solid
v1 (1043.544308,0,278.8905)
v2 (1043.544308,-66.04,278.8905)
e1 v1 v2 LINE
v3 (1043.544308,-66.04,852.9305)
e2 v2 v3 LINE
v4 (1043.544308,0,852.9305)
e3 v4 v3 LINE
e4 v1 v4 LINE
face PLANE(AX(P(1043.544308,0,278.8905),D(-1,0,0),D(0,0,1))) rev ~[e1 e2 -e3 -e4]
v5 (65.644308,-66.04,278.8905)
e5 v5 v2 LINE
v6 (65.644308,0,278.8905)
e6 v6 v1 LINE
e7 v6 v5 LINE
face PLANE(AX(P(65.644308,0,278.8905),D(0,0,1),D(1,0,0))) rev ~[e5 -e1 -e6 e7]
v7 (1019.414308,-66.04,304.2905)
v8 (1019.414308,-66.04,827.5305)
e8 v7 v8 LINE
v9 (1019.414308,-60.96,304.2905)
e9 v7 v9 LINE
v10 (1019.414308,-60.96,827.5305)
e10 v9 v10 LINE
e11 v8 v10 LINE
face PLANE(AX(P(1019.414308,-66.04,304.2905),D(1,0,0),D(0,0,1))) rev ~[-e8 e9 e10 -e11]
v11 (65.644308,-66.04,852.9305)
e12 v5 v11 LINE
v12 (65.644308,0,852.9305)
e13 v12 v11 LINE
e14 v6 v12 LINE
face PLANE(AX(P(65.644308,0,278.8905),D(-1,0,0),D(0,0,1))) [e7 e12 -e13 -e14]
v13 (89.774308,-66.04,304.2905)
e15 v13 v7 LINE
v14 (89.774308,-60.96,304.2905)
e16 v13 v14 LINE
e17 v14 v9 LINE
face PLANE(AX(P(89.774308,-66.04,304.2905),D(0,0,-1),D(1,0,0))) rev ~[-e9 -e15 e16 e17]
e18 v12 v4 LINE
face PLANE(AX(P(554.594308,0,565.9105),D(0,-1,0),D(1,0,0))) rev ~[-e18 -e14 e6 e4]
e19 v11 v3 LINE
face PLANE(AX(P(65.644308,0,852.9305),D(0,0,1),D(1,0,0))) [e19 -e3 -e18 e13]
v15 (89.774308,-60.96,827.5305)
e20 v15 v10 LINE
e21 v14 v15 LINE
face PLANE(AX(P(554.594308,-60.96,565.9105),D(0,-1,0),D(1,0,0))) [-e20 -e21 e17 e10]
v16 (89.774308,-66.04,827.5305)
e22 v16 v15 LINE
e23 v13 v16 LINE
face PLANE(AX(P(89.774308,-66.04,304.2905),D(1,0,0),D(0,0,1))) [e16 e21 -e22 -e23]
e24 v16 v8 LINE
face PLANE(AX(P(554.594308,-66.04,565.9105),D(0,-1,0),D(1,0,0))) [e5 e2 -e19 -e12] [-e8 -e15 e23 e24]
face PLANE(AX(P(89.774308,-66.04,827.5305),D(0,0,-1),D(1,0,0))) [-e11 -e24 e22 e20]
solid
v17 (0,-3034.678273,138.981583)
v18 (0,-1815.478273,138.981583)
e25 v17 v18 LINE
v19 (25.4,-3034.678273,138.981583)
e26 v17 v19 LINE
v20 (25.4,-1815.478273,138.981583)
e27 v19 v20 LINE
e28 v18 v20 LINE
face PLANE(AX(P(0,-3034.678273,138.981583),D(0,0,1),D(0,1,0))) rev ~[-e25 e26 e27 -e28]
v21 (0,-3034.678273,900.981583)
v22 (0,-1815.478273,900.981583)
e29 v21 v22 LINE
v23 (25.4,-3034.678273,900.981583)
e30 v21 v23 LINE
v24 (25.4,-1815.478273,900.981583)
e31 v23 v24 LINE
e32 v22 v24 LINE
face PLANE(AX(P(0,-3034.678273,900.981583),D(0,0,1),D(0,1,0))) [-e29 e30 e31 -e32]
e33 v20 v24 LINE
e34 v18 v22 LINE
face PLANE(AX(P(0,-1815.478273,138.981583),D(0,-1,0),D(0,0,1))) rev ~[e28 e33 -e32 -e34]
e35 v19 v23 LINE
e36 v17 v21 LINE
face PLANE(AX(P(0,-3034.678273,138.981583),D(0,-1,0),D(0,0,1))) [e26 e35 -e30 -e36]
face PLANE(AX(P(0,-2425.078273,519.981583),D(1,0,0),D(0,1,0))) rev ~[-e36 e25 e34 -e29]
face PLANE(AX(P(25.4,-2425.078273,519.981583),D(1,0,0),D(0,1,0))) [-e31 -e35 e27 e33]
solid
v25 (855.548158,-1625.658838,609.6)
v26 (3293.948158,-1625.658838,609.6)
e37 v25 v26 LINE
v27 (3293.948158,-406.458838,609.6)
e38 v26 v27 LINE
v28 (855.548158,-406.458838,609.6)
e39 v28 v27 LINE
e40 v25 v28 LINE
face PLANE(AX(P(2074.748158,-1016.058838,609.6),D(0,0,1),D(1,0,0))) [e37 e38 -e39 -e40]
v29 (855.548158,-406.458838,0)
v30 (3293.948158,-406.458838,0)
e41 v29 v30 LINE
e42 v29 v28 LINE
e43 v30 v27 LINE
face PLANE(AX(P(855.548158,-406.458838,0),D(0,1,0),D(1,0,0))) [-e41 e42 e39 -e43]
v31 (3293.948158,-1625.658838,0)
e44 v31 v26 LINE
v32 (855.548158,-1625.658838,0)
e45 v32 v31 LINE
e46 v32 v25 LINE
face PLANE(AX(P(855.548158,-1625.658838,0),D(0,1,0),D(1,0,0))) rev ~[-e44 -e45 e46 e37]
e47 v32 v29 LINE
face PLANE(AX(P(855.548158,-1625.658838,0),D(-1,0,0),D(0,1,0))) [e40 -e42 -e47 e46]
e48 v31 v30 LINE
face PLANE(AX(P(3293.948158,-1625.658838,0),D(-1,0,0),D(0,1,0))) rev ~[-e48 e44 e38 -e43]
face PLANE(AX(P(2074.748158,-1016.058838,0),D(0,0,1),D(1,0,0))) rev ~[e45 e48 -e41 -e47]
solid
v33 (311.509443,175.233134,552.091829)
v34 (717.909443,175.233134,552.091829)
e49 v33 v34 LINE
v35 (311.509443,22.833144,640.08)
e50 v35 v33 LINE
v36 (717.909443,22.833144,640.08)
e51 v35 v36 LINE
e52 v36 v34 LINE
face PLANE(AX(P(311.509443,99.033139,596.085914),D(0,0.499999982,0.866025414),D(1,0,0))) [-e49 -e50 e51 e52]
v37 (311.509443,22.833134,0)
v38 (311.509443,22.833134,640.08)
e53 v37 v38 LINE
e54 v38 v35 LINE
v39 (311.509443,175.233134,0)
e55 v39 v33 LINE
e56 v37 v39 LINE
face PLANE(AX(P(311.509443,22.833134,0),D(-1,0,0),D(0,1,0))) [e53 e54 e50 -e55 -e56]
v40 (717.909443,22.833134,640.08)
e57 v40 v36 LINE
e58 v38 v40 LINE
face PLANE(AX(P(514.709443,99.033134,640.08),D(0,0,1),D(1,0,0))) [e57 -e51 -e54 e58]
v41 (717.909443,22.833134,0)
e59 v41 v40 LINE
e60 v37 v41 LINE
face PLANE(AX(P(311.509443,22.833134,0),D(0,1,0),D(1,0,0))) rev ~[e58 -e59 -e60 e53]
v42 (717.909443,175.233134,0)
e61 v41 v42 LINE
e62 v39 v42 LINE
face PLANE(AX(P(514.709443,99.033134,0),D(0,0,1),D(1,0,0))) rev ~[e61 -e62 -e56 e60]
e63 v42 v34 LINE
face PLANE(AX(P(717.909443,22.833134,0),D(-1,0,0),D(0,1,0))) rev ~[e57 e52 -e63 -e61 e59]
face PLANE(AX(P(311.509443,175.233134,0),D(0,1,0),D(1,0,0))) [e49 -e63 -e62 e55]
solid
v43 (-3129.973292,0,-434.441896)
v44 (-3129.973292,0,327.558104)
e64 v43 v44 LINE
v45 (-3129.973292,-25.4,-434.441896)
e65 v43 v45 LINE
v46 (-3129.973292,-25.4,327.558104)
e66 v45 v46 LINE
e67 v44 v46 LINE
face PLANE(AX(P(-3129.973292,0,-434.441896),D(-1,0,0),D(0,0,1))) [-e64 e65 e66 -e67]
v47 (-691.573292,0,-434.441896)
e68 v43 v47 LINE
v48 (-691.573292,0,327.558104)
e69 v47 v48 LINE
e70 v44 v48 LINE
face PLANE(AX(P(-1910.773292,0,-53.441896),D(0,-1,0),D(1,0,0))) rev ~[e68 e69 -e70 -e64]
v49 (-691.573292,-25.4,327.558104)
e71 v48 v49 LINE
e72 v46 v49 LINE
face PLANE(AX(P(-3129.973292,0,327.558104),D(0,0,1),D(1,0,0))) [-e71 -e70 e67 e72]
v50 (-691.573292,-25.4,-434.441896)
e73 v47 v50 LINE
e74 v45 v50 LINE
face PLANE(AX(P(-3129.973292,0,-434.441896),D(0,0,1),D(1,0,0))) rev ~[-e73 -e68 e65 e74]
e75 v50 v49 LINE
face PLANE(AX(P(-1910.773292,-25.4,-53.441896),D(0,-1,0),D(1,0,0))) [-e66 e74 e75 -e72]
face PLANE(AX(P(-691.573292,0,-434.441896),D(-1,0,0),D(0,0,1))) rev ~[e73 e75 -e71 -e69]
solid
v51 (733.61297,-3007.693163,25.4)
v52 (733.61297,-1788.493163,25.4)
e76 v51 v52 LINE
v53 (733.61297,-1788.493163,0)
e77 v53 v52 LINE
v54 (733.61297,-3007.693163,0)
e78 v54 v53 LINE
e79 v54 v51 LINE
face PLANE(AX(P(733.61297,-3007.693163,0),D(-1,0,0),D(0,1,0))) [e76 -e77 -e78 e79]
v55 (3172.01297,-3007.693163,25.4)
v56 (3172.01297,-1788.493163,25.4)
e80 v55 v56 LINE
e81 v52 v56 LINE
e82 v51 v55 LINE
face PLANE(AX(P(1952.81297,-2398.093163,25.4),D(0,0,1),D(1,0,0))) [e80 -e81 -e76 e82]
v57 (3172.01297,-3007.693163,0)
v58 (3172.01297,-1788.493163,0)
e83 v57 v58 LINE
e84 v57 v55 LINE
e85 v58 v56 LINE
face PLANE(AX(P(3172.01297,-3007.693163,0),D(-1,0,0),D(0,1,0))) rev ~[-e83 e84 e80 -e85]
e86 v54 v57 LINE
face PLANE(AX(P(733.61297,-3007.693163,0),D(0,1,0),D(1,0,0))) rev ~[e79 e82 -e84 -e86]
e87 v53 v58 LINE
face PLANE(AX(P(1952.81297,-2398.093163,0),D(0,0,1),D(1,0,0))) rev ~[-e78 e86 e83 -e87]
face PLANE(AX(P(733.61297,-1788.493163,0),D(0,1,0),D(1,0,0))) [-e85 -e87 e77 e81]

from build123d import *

# Parameters (mm, degrees)
F1_W      = 977.9
F1_H      = 574.04
F2_DEPTH  = 66.04
F3_W      = 929.64
F3_H      = 523.24
F4_DEPTH  = 5.08
F5_W      = 2438.4
F5_H      = 1219.2
F6_DEPTH  = 609.6
F7_W      = 2438.4
F7_H      = 1219.2
F8_DEPTH  = 25.4
F9_W      = 2438.4
F9_H      = 762
F10_DEPTH = 25.4
F11_W     = 1219.2
F11_H     = 762
F12_DEPTH = 25.4
F13_W     = 406.4
F13_H     = 152.4
F14_DEPTH = 640.08
F15_SIZE2 = 87.988171
F15_SIZE  = 152.39999


# Not quite as in the source:
# - a fillet or chamfer is up to 0.001 mm smaller than in the source, because OpenCascade refuses the exact size


with BuildPart() as f2:
    # F1 (on Front) → F2 (new body)
    with BuildSketch(Plane.XZ):
        with Locations((554.5943079948, 565.9104996113)):
            Rectangle(F1_W, F1_H)
    extrude(amount=F2_DEPTH)

    # F3 (on face) → F4 (cut)
    with BuildSketch(Plane.XZ.offset(66.04)):
        with Locations((554.5943079948, 565.9104996113)):
            Rectangle(F3_W, F3_H)
    extrude(amount=-F4_DEPTH, mode=Mode.SUBTRACT)


with BuildPart() as f6:
    # F5 (on face) → F6 (new body)
    with BuildSketch(Plane.XY):
        with Locations((2074.7481584549, -1016.0588382279)):
            Rectangle(F5_W, F5_H)
    extrude(amount=F6_DEPTH)


with BuildPart() as f8:
    # F7 (on face) → F8 (new body)
    with BuildSketch(Plane.XY):
        with Locations((1952.8129696846, -2398.0931629392)):
            Rectangle(F7_W, F7_H)
    extrude(amount=F8_DEPTH)


with BuildPart() as f10:
    # F9 (on Front) → F10 (new body)
    with BuildSketch(Plane.XZ):
        with Locations((-1910.7732921839, -53.4418959455)):
            Rectangle(F9_W, F9_H)
    extrude(amount=F10_DEPTH)


with BuildPart() as f12:
    # F11 (on Right) → F12 (new body)
    with BuildSketch(Plane.YZ):
        with Locations((-2425.0782728195, 519.9815827243)):
            Rectangle(F11_W, F11_H)
    extrude(amount=F12_DEPTH)


with BuildPart() as f14:
    # F13 (on face) → F14 (new body)
    with BuildSketch(Plane.XY):
        with Locations((514.7094428539, 99.033133836)):
            Rectangle(F13_W, F13_H)
    extrude(amount=F14_DEPTH)

    # F15 (size 152.4 and 87.9881810245 in the source; OpenCascade refuses exactly that, so slightly less here)
    f15_edges = [f14.edges().sort_by_distance(p)[0] for p in [
        (514.709443, 175.233134, 640.08),
    ]]
    f15_side = f14.faces().sort_by_distance((514.709443, 99.033134, 640.08))[0]
    chamfer(f15_edges, length=F15_SIZE, length2=F15_SIZE2, reference=f15_side)


solid = Compound([f2.part, f6.part, f8.part, f10.part, f12.part, f14.part])
